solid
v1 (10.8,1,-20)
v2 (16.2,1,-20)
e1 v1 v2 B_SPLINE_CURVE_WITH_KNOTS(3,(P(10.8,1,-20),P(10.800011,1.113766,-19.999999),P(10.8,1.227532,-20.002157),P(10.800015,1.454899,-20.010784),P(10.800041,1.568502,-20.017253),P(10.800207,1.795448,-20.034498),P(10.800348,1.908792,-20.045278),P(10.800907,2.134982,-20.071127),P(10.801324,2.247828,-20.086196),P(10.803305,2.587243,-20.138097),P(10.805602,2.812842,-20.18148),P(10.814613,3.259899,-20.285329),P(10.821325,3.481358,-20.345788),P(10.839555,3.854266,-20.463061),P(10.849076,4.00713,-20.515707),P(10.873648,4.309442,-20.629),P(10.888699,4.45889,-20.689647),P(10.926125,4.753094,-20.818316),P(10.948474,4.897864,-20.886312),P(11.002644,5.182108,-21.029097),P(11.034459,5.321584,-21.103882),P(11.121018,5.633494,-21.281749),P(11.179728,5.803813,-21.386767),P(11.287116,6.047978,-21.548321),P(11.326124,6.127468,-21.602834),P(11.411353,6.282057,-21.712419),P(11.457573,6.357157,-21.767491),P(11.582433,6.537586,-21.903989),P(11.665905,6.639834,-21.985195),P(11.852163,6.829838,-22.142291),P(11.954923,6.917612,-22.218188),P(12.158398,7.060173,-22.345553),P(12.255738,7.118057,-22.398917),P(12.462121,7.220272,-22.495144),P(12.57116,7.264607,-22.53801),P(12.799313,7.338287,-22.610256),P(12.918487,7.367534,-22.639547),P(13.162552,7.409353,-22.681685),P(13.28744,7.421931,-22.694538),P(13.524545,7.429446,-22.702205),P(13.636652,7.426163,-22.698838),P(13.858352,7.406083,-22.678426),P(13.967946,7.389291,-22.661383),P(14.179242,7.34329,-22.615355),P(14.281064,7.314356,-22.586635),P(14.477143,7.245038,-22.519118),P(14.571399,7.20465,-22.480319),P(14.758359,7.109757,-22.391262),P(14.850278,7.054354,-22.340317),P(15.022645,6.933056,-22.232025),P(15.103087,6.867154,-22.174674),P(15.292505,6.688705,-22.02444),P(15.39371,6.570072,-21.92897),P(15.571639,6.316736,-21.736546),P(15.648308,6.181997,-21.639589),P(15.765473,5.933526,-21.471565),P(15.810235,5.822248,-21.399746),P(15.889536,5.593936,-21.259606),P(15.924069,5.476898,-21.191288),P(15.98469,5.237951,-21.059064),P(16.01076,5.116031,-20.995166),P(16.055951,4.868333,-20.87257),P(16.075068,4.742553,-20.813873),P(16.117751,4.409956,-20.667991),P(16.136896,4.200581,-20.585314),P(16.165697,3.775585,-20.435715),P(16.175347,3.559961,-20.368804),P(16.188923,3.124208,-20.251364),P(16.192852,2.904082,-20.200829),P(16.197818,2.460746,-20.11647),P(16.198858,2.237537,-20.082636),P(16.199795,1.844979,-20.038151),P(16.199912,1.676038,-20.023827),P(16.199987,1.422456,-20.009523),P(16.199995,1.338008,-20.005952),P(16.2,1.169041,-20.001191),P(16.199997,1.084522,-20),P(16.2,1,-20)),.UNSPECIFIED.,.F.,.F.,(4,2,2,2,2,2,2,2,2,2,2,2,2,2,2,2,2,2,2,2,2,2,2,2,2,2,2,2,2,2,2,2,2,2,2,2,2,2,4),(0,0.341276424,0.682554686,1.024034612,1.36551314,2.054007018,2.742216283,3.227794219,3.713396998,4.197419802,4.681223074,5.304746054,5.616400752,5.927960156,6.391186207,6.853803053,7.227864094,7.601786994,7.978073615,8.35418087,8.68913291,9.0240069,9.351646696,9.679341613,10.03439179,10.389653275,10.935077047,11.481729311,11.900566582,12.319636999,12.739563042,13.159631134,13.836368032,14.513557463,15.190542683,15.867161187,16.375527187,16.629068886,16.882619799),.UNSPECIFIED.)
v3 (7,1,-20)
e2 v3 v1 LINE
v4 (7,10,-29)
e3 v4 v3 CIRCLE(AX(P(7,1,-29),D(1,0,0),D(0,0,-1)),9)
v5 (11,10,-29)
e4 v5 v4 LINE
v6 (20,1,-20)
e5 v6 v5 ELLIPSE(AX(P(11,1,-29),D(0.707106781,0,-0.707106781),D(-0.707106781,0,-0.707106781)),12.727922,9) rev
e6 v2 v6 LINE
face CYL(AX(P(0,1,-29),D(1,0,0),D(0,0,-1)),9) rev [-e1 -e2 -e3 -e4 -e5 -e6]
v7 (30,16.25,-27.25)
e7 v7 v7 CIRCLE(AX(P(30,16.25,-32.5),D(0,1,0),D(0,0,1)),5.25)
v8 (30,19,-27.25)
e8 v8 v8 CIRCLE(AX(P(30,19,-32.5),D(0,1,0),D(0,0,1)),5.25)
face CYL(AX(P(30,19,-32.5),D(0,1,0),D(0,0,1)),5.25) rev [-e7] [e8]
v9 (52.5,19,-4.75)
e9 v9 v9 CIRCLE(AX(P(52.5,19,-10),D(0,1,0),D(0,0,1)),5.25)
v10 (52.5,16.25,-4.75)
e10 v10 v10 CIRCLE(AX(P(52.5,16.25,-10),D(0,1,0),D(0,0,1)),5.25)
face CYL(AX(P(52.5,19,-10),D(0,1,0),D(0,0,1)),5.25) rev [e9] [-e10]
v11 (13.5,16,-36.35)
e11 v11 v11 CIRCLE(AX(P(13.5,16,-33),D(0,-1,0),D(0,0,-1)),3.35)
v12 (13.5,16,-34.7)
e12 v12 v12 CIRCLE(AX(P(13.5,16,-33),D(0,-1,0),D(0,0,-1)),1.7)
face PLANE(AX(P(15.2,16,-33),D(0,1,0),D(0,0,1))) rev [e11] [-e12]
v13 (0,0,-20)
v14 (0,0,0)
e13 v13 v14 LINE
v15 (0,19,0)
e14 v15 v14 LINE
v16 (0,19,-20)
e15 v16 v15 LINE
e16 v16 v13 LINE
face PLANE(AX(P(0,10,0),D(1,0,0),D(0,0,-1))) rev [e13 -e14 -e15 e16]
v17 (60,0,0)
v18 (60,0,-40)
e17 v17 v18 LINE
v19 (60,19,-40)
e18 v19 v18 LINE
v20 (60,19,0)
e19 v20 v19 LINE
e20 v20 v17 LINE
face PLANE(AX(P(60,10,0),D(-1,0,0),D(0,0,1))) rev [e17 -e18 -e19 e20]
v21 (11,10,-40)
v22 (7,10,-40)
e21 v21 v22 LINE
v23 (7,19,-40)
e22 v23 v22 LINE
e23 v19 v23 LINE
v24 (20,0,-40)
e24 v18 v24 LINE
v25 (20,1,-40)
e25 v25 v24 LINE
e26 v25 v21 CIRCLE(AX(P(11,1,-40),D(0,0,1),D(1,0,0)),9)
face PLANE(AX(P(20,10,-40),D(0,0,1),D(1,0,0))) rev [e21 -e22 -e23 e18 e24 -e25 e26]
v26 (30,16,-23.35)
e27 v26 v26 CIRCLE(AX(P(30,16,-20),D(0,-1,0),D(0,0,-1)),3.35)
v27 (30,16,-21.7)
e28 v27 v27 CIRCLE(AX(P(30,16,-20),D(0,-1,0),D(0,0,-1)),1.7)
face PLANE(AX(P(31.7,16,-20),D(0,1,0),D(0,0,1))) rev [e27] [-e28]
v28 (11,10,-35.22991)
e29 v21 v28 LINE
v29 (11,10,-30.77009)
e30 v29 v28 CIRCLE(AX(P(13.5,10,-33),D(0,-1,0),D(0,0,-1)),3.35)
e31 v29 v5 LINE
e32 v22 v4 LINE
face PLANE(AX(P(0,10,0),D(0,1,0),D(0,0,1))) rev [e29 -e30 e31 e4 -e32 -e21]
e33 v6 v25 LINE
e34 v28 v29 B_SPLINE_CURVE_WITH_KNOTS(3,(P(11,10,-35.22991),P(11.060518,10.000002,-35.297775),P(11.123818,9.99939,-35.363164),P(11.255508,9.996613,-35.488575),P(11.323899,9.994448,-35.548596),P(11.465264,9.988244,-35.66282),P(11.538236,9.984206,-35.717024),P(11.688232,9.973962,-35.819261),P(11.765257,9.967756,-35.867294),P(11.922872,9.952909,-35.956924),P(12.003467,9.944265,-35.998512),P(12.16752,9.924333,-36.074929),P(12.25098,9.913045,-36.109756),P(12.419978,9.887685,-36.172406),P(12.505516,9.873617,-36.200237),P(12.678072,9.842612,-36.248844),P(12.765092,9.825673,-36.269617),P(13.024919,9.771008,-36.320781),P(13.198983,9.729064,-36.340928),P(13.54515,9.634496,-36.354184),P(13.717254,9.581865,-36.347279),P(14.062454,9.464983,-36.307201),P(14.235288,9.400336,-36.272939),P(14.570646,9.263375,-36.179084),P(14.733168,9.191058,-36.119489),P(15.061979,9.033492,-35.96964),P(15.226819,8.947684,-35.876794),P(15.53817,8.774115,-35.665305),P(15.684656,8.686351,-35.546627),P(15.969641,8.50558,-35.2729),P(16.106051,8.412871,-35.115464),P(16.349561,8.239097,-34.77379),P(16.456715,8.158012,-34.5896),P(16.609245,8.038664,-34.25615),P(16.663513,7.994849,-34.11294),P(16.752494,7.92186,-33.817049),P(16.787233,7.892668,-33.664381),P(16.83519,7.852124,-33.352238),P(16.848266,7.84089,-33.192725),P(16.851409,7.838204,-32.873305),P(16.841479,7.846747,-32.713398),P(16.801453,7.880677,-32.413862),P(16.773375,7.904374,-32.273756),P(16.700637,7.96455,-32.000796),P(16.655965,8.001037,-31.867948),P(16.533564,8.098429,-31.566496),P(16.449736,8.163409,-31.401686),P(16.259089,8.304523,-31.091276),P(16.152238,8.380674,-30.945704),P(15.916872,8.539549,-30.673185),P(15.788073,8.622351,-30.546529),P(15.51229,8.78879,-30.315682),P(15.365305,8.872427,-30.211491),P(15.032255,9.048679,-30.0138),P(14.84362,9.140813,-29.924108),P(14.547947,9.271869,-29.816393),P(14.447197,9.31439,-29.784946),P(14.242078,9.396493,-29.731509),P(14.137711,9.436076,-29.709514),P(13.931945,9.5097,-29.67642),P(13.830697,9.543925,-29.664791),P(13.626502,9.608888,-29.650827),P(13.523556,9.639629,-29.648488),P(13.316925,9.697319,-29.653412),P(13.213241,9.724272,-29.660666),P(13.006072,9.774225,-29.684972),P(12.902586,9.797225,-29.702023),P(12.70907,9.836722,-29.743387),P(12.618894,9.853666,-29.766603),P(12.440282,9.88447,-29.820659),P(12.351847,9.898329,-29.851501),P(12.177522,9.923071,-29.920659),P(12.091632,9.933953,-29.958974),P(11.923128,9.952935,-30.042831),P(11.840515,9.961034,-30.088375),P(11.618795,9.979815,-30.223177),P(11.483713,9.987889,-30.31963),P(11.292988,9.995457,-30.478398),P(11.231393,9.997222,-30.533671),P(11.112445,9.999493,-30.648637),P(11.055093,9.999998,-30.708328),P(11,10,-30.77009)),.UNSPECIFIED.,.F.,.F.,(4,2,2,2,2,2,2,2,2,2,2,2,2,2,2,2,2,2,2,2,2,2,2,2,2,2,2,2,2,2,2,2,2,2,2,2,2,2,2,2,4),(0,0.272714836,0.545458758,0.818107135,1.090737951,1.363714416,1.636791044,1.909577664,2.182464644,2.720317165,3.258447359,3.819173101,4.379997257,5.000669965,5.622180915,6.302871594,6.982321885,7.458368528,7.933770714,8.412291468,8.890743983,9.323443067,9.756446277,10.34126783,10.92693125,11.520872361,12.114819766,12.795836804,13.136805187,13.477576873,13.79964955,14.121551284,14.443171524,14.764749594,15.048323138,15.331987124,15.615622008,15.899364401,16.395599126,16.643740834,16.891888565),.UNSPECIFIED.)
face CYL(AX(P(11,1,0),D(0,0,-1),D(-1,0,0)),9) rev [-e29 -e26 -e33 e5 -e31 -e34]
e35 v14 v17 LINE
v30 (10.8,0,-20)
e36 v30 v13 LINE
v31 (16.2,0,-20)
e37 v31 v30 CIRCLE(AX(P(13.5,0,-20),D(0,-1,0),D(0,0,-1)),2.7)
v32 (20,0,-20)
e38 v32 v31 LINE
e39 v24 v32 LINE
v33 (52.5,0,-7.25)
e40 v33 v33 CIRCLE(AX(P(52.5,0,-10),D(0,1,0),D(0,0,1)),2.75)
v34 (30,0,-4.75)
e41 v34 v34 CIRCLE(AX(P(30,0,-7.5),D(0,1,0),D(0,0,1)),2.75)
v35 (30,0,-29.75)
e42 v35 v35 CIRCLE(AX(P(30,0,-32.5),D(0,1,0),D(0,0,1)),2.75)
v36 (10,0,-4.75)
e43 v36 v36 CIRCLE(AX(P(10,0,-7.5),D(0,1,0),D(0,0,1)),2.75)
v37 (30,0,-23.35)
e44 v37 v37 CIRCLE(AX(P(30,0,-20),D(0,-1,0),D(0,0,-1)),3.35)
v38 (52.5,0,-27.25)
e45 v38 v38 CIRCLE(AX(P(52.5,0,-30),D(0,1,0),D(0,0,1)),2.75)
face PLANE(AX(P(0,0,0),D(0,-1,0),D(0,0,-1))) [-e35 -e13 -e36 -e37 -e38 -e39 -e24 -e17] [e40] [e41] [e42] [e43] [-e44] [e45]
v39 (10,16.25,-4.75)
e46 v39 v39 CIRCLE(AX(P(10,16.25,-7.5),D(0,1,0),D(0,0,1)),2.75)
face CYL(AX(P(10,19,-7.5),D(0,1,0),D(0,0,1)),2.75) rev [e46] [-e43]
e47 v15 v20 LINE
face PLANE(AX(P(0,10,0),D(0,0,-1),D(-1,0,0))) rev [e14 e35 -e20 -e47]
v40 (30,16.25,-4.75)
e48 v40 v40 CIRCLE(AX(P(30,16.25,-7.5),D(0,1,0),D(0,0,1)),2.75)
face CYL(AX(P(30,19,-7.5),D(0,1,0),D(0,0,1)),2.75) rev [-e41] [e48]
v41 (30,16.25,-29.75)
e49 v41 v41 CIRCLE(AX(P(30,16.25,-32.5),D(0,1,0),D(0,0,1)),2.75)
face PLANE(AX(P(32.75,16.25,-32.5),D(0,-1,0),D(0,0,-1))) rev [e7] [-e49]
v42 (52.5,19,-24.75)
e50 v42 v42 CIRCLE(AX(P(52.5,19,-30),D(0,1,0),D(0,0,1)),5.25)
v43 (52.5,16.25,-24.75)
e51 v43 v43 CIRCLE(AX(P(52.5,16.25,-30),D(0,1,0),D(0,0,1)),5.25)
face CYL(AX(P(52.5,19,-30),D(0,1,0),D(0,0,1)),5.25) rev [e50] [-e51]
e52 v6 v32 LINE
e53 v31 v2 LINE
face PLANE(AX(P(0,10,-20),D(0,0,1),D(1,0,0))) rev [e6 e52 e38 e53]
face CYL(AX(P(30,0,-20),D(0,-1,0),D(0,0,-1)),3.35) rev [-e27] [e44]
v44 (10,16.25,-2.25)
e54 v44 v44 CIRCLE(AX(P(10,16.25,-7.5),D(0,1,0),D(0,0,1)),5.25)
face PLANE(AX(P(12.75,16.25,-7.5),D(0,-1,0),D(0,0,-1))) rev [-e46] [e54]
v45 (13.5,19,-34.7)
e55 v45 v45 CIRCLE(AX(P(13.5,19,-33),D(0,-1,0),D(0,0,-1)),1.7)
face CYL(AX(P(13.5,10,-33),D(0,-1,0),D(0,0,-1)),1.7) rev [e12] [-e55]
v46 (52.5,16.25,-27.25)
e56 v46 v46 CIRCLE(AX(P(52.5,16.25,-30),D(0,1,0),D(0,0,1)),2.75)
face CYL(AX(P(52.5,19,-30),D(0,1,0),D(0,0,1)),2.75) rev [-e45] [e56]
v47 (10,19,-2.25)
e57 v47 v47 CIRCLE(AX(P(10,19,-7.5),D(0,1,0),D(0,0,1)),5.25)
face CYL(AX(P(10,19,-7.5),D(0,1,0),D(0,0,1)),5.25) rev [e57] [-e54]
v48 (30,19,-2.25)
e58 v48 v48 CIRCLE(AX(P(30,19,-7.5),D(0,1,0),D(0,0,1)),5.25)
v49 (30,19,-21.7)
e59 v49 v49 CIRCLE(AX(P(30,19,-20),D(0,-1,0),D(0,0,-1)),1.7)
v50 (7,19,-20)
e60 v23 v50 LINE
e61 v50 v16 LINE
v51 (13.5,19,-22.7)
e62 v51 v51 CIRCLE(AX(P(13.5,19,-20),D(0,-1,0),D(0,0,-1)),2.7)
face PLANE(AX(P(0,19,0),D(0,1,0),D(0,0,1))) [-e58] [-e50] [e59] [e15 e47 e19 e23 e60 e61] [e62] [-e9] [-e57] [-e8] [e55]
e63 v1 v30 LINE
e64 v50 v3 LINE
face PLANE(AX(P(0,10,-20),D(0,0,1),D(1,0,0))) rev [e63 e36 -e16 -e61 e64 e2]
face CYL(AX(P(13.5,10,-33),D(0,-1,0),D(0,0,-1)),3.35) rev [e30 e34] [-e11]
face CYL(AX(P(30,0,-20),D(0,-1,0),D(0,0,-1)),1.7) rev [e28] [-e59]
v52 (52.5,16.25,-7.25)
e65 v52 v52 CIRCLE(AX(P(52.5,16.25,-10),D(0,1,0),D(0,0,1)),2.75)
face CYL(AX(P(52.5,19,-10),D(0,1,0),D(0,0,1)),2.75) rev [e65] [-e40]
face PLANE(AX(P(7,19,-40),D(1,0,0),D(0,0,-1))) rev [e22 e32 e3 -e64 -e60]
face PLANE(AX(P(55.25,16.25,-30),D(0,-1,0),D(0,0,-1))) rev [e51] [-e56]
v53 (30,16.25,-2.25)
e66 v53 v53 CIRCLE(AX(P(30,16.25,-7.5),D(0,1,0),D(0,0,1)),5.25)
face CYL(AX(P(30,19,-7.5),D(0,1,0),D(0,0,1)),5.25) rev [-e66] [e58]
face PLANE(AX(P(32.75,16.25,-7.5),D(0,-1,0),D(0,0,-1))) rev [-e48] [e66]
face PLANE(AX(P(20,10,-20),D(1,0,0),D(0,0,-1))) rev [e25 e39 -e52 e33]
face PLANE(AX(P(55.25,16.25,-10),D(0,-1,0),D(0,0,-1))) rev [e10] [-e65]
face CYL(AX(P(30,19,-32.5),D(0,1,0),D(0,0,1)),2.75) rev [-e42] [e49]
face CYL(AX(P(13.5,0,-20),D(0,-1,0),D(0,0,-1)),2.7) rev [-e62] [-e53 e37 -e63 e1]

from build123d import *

# Parameters (mm, degrees)
BOSS_EXTRUDE1_DEPTH             = 10
BOSS_EXTRUDE2_DEPTH             = 9
CBORE_FOR_M5_SBHCS1_D           = 5.5
CBORE_FOR_M5_SBHCS1_CBORE_D     = 10.5
CBORE_FOR_M5_SBHCS1_CBORE_DEPTH = 2.75
CBORE_FOR_M5_SBHCS2_D           = 5.5
CBORE_FOR_M5_SBHCS2_CBORE_D     = 10.5
CBORE_FOR_M5_SBHCS2_CBORE_DEPTH = 2.75
CBORE_FOR_M3_SBHCS1_D           = 3.4
CBORE_FOR_M3_SBHCS1_CBORE_D     = 6.7
CBORE_FOR_M3_SBHCS1_CBORE_DEPTH = 16
CBORE_FOR_M3_SBHCS2_D           = 3.4
CBORE_FOR_M3_SBHCS2_CBORE_D     = 6.7
CBORE_FOR_M3_SBHCS2_CBORE_DEPTH = 6
F_5_4_5_4_DIAMETER_HOLE1_D      = 5.4
FILLET3_R                       = 9


with BuildPart() as part:
    # Sketch1 → Boss-Extrude1 (new body)
    with BuildSketch(Plane(origin=(0, 0, 0), x_dir=(1, 0, 0), z_dir=(0, 1, 0))):
        Polygon((0, 0), (60, 0), (60, 40), (20, 40), (20, 20), (0, 20), align=None)
    extrude(amount=BOSS_EXTRUDE1_DEPTH)

    # Sketch2 → Boss-Extrude2 (add)
    with BuildSketch(Plane(origin=(0, 10, 0), x_dir=(1, 0, 0), z_dir=(0, 1, 0))):
        Polygon((20, 40), (7, 40), (7, 20), (0, 20), (0, 0), (60, 0), (60, 40), align=None)
    extrude(amount=BOSS_EXTRUDE2_DEPTH)

    # CBORE for M5 SBHCS1 (through all)
    with Locations(Plane(origin=(0, 19, 0), x_dir=(1, 0, 0), z_dir=(0, 1, 0))):
        with Locations((10, 7.5), (30, 7.5), (30, 32.5)):
            CounterBoreHole(CBORE_FOR_M5_SBHCS1_D / 2, CBORE_FOR_M5_SBHCS1_CBORE_D / 2, CBORE_FOR_M5_SBHCS1_CBORE_DEPTH)

    # CBORE for M5 SBHCS2 (through all)
    with Locations(Plane(origin=(0, 19, 0), x_dir=(1, 0, 0), z_dir=(0, 1, 0))):
        with Locations((52.5, 30), (52.5, 10)):
            CounterBoreHole(CBORE_FOR_M5_SBHCS2_D / 2, CBORE_FOR_M5_SBHCS2_CBORE_D / 2, CBORE_FOR_M5_SBHCS2_CBORE_DEPTH)

    # CBORE for M3 SBHCS1 (through all)
    with Locations(Plane(origin=(0, 0, 0), x_dir=(-1, 0, 0), z_dir=(0, -1, 0))):
        with Locations((-30, 20)):
            CounterBoreHole(CBORE_FOR_M3_SBHCS1_D / 2, CBORE_FOR_M3_SBHCS1_CBORE_D / 2, CBORE_FOR_M3_SBHCS1_CBORE_DEPTH)

    # CBORE for M3 SBHCS2 (through all)
    with Locations(Plane(origin=(0, 10, 0), x_dir=(-1, 0, 0), z_dir=(0, -1, 0))):
        with Locations((-13.5, 33)):
            CounterBoreHole(CBORE_FOR_M3_SBHCS2_D / 2, CBORE_FOR_M3_SBHCS2_CBORE_D / 2, CBORE_FOR_M3_SBHCS2_CBORE_DEPTH)

    # Ø5.4 (5.4) Diameter Hole1 (through all)
    with Locations(Plane(origin=(0, 0, 0), x_dir=(-1, 0, 0), z_dir=(0, -1, 0))):
        with Locations((-13.5, 20)):
            Hole(F_5_4_5_4_DIAMETER_HOLE1_D / 2)

    # Fillet3
    # the kernel refuses this fillet: 9 mm, written as the material it adds along each edge
    with BuildSketch(Plane(origin=(20, 10, -40), x_dir=(0, -1, 0), z_dir=(0, 0, 1))) as fillet3_piece_1_section:
        with BuildLine():
            CenterArc((FILLET3_R, -FILLET3_R), FILLET3_R, 90, 90)
            Line((0, -FILLET3_R), (0, 0))
            Line((0, 0), (FILLET3_R, 0))
        make_face()
    fillet3_piece_1 = extrude(amount=20, mode=Mode.PRIVATE)
    fillet3_piece_1 = fillet3_piece_1 - Plane(origin=(13.5, 7.877517224, -20), x_dir=(1, 0, 0), z_dir=(0, 1, 0)) * Cylinder(2.7, 76, mode=Mode.PRIVATE)
    fillet3_piece_1 = fillet3_piece_1 - Plane(origin=(13.5, 7.877517224, -33), x_dir=(-1, 0, 0), z_dir=(0, -1, 0)) * Cylinder(3.35, 76, mode=Mode.PRIVATE)
    add(fillet3_piece_1)
    with BuildSketch(Plane(origin=(33.3, 10, -20), x_dir=(0, -1, 0), z_dir=(-1, 0, 0))) as fillet3_piece_2_section:
        with BuildLine():
            CenterArc((FILLET3_R, -FILLET3_R), FILLET3_R, 90, 90)
            Line((0, -FILLET3_R), (0, 0))
            Line((0, 0), (FILLET3_R, 0))
        make_face()
    fillet3_piece_2 = extrude(amount=26.3, mode=Mode.PRIVATE)
    fillet3_piece_2 = fillet3_piece_2 - Plane(origin=(13.5, 3.343699997, -20), x_dir=(1, 0, 0), z_dir=(0, 1, 0)) * Cylinder(2.7, 89, mode=Mode.PRIVATE)
    fillet3_piece_2 = split(fillet3_piece_2, bisect_by=Plane(origin=(20, 3.343699997, -20.253192533), z_dir=(-1, 0, 0)), keep=Keep.TOP, mode=Mode.PRIVATE)
    add(fillet3_piece_2)


solid = part.part
